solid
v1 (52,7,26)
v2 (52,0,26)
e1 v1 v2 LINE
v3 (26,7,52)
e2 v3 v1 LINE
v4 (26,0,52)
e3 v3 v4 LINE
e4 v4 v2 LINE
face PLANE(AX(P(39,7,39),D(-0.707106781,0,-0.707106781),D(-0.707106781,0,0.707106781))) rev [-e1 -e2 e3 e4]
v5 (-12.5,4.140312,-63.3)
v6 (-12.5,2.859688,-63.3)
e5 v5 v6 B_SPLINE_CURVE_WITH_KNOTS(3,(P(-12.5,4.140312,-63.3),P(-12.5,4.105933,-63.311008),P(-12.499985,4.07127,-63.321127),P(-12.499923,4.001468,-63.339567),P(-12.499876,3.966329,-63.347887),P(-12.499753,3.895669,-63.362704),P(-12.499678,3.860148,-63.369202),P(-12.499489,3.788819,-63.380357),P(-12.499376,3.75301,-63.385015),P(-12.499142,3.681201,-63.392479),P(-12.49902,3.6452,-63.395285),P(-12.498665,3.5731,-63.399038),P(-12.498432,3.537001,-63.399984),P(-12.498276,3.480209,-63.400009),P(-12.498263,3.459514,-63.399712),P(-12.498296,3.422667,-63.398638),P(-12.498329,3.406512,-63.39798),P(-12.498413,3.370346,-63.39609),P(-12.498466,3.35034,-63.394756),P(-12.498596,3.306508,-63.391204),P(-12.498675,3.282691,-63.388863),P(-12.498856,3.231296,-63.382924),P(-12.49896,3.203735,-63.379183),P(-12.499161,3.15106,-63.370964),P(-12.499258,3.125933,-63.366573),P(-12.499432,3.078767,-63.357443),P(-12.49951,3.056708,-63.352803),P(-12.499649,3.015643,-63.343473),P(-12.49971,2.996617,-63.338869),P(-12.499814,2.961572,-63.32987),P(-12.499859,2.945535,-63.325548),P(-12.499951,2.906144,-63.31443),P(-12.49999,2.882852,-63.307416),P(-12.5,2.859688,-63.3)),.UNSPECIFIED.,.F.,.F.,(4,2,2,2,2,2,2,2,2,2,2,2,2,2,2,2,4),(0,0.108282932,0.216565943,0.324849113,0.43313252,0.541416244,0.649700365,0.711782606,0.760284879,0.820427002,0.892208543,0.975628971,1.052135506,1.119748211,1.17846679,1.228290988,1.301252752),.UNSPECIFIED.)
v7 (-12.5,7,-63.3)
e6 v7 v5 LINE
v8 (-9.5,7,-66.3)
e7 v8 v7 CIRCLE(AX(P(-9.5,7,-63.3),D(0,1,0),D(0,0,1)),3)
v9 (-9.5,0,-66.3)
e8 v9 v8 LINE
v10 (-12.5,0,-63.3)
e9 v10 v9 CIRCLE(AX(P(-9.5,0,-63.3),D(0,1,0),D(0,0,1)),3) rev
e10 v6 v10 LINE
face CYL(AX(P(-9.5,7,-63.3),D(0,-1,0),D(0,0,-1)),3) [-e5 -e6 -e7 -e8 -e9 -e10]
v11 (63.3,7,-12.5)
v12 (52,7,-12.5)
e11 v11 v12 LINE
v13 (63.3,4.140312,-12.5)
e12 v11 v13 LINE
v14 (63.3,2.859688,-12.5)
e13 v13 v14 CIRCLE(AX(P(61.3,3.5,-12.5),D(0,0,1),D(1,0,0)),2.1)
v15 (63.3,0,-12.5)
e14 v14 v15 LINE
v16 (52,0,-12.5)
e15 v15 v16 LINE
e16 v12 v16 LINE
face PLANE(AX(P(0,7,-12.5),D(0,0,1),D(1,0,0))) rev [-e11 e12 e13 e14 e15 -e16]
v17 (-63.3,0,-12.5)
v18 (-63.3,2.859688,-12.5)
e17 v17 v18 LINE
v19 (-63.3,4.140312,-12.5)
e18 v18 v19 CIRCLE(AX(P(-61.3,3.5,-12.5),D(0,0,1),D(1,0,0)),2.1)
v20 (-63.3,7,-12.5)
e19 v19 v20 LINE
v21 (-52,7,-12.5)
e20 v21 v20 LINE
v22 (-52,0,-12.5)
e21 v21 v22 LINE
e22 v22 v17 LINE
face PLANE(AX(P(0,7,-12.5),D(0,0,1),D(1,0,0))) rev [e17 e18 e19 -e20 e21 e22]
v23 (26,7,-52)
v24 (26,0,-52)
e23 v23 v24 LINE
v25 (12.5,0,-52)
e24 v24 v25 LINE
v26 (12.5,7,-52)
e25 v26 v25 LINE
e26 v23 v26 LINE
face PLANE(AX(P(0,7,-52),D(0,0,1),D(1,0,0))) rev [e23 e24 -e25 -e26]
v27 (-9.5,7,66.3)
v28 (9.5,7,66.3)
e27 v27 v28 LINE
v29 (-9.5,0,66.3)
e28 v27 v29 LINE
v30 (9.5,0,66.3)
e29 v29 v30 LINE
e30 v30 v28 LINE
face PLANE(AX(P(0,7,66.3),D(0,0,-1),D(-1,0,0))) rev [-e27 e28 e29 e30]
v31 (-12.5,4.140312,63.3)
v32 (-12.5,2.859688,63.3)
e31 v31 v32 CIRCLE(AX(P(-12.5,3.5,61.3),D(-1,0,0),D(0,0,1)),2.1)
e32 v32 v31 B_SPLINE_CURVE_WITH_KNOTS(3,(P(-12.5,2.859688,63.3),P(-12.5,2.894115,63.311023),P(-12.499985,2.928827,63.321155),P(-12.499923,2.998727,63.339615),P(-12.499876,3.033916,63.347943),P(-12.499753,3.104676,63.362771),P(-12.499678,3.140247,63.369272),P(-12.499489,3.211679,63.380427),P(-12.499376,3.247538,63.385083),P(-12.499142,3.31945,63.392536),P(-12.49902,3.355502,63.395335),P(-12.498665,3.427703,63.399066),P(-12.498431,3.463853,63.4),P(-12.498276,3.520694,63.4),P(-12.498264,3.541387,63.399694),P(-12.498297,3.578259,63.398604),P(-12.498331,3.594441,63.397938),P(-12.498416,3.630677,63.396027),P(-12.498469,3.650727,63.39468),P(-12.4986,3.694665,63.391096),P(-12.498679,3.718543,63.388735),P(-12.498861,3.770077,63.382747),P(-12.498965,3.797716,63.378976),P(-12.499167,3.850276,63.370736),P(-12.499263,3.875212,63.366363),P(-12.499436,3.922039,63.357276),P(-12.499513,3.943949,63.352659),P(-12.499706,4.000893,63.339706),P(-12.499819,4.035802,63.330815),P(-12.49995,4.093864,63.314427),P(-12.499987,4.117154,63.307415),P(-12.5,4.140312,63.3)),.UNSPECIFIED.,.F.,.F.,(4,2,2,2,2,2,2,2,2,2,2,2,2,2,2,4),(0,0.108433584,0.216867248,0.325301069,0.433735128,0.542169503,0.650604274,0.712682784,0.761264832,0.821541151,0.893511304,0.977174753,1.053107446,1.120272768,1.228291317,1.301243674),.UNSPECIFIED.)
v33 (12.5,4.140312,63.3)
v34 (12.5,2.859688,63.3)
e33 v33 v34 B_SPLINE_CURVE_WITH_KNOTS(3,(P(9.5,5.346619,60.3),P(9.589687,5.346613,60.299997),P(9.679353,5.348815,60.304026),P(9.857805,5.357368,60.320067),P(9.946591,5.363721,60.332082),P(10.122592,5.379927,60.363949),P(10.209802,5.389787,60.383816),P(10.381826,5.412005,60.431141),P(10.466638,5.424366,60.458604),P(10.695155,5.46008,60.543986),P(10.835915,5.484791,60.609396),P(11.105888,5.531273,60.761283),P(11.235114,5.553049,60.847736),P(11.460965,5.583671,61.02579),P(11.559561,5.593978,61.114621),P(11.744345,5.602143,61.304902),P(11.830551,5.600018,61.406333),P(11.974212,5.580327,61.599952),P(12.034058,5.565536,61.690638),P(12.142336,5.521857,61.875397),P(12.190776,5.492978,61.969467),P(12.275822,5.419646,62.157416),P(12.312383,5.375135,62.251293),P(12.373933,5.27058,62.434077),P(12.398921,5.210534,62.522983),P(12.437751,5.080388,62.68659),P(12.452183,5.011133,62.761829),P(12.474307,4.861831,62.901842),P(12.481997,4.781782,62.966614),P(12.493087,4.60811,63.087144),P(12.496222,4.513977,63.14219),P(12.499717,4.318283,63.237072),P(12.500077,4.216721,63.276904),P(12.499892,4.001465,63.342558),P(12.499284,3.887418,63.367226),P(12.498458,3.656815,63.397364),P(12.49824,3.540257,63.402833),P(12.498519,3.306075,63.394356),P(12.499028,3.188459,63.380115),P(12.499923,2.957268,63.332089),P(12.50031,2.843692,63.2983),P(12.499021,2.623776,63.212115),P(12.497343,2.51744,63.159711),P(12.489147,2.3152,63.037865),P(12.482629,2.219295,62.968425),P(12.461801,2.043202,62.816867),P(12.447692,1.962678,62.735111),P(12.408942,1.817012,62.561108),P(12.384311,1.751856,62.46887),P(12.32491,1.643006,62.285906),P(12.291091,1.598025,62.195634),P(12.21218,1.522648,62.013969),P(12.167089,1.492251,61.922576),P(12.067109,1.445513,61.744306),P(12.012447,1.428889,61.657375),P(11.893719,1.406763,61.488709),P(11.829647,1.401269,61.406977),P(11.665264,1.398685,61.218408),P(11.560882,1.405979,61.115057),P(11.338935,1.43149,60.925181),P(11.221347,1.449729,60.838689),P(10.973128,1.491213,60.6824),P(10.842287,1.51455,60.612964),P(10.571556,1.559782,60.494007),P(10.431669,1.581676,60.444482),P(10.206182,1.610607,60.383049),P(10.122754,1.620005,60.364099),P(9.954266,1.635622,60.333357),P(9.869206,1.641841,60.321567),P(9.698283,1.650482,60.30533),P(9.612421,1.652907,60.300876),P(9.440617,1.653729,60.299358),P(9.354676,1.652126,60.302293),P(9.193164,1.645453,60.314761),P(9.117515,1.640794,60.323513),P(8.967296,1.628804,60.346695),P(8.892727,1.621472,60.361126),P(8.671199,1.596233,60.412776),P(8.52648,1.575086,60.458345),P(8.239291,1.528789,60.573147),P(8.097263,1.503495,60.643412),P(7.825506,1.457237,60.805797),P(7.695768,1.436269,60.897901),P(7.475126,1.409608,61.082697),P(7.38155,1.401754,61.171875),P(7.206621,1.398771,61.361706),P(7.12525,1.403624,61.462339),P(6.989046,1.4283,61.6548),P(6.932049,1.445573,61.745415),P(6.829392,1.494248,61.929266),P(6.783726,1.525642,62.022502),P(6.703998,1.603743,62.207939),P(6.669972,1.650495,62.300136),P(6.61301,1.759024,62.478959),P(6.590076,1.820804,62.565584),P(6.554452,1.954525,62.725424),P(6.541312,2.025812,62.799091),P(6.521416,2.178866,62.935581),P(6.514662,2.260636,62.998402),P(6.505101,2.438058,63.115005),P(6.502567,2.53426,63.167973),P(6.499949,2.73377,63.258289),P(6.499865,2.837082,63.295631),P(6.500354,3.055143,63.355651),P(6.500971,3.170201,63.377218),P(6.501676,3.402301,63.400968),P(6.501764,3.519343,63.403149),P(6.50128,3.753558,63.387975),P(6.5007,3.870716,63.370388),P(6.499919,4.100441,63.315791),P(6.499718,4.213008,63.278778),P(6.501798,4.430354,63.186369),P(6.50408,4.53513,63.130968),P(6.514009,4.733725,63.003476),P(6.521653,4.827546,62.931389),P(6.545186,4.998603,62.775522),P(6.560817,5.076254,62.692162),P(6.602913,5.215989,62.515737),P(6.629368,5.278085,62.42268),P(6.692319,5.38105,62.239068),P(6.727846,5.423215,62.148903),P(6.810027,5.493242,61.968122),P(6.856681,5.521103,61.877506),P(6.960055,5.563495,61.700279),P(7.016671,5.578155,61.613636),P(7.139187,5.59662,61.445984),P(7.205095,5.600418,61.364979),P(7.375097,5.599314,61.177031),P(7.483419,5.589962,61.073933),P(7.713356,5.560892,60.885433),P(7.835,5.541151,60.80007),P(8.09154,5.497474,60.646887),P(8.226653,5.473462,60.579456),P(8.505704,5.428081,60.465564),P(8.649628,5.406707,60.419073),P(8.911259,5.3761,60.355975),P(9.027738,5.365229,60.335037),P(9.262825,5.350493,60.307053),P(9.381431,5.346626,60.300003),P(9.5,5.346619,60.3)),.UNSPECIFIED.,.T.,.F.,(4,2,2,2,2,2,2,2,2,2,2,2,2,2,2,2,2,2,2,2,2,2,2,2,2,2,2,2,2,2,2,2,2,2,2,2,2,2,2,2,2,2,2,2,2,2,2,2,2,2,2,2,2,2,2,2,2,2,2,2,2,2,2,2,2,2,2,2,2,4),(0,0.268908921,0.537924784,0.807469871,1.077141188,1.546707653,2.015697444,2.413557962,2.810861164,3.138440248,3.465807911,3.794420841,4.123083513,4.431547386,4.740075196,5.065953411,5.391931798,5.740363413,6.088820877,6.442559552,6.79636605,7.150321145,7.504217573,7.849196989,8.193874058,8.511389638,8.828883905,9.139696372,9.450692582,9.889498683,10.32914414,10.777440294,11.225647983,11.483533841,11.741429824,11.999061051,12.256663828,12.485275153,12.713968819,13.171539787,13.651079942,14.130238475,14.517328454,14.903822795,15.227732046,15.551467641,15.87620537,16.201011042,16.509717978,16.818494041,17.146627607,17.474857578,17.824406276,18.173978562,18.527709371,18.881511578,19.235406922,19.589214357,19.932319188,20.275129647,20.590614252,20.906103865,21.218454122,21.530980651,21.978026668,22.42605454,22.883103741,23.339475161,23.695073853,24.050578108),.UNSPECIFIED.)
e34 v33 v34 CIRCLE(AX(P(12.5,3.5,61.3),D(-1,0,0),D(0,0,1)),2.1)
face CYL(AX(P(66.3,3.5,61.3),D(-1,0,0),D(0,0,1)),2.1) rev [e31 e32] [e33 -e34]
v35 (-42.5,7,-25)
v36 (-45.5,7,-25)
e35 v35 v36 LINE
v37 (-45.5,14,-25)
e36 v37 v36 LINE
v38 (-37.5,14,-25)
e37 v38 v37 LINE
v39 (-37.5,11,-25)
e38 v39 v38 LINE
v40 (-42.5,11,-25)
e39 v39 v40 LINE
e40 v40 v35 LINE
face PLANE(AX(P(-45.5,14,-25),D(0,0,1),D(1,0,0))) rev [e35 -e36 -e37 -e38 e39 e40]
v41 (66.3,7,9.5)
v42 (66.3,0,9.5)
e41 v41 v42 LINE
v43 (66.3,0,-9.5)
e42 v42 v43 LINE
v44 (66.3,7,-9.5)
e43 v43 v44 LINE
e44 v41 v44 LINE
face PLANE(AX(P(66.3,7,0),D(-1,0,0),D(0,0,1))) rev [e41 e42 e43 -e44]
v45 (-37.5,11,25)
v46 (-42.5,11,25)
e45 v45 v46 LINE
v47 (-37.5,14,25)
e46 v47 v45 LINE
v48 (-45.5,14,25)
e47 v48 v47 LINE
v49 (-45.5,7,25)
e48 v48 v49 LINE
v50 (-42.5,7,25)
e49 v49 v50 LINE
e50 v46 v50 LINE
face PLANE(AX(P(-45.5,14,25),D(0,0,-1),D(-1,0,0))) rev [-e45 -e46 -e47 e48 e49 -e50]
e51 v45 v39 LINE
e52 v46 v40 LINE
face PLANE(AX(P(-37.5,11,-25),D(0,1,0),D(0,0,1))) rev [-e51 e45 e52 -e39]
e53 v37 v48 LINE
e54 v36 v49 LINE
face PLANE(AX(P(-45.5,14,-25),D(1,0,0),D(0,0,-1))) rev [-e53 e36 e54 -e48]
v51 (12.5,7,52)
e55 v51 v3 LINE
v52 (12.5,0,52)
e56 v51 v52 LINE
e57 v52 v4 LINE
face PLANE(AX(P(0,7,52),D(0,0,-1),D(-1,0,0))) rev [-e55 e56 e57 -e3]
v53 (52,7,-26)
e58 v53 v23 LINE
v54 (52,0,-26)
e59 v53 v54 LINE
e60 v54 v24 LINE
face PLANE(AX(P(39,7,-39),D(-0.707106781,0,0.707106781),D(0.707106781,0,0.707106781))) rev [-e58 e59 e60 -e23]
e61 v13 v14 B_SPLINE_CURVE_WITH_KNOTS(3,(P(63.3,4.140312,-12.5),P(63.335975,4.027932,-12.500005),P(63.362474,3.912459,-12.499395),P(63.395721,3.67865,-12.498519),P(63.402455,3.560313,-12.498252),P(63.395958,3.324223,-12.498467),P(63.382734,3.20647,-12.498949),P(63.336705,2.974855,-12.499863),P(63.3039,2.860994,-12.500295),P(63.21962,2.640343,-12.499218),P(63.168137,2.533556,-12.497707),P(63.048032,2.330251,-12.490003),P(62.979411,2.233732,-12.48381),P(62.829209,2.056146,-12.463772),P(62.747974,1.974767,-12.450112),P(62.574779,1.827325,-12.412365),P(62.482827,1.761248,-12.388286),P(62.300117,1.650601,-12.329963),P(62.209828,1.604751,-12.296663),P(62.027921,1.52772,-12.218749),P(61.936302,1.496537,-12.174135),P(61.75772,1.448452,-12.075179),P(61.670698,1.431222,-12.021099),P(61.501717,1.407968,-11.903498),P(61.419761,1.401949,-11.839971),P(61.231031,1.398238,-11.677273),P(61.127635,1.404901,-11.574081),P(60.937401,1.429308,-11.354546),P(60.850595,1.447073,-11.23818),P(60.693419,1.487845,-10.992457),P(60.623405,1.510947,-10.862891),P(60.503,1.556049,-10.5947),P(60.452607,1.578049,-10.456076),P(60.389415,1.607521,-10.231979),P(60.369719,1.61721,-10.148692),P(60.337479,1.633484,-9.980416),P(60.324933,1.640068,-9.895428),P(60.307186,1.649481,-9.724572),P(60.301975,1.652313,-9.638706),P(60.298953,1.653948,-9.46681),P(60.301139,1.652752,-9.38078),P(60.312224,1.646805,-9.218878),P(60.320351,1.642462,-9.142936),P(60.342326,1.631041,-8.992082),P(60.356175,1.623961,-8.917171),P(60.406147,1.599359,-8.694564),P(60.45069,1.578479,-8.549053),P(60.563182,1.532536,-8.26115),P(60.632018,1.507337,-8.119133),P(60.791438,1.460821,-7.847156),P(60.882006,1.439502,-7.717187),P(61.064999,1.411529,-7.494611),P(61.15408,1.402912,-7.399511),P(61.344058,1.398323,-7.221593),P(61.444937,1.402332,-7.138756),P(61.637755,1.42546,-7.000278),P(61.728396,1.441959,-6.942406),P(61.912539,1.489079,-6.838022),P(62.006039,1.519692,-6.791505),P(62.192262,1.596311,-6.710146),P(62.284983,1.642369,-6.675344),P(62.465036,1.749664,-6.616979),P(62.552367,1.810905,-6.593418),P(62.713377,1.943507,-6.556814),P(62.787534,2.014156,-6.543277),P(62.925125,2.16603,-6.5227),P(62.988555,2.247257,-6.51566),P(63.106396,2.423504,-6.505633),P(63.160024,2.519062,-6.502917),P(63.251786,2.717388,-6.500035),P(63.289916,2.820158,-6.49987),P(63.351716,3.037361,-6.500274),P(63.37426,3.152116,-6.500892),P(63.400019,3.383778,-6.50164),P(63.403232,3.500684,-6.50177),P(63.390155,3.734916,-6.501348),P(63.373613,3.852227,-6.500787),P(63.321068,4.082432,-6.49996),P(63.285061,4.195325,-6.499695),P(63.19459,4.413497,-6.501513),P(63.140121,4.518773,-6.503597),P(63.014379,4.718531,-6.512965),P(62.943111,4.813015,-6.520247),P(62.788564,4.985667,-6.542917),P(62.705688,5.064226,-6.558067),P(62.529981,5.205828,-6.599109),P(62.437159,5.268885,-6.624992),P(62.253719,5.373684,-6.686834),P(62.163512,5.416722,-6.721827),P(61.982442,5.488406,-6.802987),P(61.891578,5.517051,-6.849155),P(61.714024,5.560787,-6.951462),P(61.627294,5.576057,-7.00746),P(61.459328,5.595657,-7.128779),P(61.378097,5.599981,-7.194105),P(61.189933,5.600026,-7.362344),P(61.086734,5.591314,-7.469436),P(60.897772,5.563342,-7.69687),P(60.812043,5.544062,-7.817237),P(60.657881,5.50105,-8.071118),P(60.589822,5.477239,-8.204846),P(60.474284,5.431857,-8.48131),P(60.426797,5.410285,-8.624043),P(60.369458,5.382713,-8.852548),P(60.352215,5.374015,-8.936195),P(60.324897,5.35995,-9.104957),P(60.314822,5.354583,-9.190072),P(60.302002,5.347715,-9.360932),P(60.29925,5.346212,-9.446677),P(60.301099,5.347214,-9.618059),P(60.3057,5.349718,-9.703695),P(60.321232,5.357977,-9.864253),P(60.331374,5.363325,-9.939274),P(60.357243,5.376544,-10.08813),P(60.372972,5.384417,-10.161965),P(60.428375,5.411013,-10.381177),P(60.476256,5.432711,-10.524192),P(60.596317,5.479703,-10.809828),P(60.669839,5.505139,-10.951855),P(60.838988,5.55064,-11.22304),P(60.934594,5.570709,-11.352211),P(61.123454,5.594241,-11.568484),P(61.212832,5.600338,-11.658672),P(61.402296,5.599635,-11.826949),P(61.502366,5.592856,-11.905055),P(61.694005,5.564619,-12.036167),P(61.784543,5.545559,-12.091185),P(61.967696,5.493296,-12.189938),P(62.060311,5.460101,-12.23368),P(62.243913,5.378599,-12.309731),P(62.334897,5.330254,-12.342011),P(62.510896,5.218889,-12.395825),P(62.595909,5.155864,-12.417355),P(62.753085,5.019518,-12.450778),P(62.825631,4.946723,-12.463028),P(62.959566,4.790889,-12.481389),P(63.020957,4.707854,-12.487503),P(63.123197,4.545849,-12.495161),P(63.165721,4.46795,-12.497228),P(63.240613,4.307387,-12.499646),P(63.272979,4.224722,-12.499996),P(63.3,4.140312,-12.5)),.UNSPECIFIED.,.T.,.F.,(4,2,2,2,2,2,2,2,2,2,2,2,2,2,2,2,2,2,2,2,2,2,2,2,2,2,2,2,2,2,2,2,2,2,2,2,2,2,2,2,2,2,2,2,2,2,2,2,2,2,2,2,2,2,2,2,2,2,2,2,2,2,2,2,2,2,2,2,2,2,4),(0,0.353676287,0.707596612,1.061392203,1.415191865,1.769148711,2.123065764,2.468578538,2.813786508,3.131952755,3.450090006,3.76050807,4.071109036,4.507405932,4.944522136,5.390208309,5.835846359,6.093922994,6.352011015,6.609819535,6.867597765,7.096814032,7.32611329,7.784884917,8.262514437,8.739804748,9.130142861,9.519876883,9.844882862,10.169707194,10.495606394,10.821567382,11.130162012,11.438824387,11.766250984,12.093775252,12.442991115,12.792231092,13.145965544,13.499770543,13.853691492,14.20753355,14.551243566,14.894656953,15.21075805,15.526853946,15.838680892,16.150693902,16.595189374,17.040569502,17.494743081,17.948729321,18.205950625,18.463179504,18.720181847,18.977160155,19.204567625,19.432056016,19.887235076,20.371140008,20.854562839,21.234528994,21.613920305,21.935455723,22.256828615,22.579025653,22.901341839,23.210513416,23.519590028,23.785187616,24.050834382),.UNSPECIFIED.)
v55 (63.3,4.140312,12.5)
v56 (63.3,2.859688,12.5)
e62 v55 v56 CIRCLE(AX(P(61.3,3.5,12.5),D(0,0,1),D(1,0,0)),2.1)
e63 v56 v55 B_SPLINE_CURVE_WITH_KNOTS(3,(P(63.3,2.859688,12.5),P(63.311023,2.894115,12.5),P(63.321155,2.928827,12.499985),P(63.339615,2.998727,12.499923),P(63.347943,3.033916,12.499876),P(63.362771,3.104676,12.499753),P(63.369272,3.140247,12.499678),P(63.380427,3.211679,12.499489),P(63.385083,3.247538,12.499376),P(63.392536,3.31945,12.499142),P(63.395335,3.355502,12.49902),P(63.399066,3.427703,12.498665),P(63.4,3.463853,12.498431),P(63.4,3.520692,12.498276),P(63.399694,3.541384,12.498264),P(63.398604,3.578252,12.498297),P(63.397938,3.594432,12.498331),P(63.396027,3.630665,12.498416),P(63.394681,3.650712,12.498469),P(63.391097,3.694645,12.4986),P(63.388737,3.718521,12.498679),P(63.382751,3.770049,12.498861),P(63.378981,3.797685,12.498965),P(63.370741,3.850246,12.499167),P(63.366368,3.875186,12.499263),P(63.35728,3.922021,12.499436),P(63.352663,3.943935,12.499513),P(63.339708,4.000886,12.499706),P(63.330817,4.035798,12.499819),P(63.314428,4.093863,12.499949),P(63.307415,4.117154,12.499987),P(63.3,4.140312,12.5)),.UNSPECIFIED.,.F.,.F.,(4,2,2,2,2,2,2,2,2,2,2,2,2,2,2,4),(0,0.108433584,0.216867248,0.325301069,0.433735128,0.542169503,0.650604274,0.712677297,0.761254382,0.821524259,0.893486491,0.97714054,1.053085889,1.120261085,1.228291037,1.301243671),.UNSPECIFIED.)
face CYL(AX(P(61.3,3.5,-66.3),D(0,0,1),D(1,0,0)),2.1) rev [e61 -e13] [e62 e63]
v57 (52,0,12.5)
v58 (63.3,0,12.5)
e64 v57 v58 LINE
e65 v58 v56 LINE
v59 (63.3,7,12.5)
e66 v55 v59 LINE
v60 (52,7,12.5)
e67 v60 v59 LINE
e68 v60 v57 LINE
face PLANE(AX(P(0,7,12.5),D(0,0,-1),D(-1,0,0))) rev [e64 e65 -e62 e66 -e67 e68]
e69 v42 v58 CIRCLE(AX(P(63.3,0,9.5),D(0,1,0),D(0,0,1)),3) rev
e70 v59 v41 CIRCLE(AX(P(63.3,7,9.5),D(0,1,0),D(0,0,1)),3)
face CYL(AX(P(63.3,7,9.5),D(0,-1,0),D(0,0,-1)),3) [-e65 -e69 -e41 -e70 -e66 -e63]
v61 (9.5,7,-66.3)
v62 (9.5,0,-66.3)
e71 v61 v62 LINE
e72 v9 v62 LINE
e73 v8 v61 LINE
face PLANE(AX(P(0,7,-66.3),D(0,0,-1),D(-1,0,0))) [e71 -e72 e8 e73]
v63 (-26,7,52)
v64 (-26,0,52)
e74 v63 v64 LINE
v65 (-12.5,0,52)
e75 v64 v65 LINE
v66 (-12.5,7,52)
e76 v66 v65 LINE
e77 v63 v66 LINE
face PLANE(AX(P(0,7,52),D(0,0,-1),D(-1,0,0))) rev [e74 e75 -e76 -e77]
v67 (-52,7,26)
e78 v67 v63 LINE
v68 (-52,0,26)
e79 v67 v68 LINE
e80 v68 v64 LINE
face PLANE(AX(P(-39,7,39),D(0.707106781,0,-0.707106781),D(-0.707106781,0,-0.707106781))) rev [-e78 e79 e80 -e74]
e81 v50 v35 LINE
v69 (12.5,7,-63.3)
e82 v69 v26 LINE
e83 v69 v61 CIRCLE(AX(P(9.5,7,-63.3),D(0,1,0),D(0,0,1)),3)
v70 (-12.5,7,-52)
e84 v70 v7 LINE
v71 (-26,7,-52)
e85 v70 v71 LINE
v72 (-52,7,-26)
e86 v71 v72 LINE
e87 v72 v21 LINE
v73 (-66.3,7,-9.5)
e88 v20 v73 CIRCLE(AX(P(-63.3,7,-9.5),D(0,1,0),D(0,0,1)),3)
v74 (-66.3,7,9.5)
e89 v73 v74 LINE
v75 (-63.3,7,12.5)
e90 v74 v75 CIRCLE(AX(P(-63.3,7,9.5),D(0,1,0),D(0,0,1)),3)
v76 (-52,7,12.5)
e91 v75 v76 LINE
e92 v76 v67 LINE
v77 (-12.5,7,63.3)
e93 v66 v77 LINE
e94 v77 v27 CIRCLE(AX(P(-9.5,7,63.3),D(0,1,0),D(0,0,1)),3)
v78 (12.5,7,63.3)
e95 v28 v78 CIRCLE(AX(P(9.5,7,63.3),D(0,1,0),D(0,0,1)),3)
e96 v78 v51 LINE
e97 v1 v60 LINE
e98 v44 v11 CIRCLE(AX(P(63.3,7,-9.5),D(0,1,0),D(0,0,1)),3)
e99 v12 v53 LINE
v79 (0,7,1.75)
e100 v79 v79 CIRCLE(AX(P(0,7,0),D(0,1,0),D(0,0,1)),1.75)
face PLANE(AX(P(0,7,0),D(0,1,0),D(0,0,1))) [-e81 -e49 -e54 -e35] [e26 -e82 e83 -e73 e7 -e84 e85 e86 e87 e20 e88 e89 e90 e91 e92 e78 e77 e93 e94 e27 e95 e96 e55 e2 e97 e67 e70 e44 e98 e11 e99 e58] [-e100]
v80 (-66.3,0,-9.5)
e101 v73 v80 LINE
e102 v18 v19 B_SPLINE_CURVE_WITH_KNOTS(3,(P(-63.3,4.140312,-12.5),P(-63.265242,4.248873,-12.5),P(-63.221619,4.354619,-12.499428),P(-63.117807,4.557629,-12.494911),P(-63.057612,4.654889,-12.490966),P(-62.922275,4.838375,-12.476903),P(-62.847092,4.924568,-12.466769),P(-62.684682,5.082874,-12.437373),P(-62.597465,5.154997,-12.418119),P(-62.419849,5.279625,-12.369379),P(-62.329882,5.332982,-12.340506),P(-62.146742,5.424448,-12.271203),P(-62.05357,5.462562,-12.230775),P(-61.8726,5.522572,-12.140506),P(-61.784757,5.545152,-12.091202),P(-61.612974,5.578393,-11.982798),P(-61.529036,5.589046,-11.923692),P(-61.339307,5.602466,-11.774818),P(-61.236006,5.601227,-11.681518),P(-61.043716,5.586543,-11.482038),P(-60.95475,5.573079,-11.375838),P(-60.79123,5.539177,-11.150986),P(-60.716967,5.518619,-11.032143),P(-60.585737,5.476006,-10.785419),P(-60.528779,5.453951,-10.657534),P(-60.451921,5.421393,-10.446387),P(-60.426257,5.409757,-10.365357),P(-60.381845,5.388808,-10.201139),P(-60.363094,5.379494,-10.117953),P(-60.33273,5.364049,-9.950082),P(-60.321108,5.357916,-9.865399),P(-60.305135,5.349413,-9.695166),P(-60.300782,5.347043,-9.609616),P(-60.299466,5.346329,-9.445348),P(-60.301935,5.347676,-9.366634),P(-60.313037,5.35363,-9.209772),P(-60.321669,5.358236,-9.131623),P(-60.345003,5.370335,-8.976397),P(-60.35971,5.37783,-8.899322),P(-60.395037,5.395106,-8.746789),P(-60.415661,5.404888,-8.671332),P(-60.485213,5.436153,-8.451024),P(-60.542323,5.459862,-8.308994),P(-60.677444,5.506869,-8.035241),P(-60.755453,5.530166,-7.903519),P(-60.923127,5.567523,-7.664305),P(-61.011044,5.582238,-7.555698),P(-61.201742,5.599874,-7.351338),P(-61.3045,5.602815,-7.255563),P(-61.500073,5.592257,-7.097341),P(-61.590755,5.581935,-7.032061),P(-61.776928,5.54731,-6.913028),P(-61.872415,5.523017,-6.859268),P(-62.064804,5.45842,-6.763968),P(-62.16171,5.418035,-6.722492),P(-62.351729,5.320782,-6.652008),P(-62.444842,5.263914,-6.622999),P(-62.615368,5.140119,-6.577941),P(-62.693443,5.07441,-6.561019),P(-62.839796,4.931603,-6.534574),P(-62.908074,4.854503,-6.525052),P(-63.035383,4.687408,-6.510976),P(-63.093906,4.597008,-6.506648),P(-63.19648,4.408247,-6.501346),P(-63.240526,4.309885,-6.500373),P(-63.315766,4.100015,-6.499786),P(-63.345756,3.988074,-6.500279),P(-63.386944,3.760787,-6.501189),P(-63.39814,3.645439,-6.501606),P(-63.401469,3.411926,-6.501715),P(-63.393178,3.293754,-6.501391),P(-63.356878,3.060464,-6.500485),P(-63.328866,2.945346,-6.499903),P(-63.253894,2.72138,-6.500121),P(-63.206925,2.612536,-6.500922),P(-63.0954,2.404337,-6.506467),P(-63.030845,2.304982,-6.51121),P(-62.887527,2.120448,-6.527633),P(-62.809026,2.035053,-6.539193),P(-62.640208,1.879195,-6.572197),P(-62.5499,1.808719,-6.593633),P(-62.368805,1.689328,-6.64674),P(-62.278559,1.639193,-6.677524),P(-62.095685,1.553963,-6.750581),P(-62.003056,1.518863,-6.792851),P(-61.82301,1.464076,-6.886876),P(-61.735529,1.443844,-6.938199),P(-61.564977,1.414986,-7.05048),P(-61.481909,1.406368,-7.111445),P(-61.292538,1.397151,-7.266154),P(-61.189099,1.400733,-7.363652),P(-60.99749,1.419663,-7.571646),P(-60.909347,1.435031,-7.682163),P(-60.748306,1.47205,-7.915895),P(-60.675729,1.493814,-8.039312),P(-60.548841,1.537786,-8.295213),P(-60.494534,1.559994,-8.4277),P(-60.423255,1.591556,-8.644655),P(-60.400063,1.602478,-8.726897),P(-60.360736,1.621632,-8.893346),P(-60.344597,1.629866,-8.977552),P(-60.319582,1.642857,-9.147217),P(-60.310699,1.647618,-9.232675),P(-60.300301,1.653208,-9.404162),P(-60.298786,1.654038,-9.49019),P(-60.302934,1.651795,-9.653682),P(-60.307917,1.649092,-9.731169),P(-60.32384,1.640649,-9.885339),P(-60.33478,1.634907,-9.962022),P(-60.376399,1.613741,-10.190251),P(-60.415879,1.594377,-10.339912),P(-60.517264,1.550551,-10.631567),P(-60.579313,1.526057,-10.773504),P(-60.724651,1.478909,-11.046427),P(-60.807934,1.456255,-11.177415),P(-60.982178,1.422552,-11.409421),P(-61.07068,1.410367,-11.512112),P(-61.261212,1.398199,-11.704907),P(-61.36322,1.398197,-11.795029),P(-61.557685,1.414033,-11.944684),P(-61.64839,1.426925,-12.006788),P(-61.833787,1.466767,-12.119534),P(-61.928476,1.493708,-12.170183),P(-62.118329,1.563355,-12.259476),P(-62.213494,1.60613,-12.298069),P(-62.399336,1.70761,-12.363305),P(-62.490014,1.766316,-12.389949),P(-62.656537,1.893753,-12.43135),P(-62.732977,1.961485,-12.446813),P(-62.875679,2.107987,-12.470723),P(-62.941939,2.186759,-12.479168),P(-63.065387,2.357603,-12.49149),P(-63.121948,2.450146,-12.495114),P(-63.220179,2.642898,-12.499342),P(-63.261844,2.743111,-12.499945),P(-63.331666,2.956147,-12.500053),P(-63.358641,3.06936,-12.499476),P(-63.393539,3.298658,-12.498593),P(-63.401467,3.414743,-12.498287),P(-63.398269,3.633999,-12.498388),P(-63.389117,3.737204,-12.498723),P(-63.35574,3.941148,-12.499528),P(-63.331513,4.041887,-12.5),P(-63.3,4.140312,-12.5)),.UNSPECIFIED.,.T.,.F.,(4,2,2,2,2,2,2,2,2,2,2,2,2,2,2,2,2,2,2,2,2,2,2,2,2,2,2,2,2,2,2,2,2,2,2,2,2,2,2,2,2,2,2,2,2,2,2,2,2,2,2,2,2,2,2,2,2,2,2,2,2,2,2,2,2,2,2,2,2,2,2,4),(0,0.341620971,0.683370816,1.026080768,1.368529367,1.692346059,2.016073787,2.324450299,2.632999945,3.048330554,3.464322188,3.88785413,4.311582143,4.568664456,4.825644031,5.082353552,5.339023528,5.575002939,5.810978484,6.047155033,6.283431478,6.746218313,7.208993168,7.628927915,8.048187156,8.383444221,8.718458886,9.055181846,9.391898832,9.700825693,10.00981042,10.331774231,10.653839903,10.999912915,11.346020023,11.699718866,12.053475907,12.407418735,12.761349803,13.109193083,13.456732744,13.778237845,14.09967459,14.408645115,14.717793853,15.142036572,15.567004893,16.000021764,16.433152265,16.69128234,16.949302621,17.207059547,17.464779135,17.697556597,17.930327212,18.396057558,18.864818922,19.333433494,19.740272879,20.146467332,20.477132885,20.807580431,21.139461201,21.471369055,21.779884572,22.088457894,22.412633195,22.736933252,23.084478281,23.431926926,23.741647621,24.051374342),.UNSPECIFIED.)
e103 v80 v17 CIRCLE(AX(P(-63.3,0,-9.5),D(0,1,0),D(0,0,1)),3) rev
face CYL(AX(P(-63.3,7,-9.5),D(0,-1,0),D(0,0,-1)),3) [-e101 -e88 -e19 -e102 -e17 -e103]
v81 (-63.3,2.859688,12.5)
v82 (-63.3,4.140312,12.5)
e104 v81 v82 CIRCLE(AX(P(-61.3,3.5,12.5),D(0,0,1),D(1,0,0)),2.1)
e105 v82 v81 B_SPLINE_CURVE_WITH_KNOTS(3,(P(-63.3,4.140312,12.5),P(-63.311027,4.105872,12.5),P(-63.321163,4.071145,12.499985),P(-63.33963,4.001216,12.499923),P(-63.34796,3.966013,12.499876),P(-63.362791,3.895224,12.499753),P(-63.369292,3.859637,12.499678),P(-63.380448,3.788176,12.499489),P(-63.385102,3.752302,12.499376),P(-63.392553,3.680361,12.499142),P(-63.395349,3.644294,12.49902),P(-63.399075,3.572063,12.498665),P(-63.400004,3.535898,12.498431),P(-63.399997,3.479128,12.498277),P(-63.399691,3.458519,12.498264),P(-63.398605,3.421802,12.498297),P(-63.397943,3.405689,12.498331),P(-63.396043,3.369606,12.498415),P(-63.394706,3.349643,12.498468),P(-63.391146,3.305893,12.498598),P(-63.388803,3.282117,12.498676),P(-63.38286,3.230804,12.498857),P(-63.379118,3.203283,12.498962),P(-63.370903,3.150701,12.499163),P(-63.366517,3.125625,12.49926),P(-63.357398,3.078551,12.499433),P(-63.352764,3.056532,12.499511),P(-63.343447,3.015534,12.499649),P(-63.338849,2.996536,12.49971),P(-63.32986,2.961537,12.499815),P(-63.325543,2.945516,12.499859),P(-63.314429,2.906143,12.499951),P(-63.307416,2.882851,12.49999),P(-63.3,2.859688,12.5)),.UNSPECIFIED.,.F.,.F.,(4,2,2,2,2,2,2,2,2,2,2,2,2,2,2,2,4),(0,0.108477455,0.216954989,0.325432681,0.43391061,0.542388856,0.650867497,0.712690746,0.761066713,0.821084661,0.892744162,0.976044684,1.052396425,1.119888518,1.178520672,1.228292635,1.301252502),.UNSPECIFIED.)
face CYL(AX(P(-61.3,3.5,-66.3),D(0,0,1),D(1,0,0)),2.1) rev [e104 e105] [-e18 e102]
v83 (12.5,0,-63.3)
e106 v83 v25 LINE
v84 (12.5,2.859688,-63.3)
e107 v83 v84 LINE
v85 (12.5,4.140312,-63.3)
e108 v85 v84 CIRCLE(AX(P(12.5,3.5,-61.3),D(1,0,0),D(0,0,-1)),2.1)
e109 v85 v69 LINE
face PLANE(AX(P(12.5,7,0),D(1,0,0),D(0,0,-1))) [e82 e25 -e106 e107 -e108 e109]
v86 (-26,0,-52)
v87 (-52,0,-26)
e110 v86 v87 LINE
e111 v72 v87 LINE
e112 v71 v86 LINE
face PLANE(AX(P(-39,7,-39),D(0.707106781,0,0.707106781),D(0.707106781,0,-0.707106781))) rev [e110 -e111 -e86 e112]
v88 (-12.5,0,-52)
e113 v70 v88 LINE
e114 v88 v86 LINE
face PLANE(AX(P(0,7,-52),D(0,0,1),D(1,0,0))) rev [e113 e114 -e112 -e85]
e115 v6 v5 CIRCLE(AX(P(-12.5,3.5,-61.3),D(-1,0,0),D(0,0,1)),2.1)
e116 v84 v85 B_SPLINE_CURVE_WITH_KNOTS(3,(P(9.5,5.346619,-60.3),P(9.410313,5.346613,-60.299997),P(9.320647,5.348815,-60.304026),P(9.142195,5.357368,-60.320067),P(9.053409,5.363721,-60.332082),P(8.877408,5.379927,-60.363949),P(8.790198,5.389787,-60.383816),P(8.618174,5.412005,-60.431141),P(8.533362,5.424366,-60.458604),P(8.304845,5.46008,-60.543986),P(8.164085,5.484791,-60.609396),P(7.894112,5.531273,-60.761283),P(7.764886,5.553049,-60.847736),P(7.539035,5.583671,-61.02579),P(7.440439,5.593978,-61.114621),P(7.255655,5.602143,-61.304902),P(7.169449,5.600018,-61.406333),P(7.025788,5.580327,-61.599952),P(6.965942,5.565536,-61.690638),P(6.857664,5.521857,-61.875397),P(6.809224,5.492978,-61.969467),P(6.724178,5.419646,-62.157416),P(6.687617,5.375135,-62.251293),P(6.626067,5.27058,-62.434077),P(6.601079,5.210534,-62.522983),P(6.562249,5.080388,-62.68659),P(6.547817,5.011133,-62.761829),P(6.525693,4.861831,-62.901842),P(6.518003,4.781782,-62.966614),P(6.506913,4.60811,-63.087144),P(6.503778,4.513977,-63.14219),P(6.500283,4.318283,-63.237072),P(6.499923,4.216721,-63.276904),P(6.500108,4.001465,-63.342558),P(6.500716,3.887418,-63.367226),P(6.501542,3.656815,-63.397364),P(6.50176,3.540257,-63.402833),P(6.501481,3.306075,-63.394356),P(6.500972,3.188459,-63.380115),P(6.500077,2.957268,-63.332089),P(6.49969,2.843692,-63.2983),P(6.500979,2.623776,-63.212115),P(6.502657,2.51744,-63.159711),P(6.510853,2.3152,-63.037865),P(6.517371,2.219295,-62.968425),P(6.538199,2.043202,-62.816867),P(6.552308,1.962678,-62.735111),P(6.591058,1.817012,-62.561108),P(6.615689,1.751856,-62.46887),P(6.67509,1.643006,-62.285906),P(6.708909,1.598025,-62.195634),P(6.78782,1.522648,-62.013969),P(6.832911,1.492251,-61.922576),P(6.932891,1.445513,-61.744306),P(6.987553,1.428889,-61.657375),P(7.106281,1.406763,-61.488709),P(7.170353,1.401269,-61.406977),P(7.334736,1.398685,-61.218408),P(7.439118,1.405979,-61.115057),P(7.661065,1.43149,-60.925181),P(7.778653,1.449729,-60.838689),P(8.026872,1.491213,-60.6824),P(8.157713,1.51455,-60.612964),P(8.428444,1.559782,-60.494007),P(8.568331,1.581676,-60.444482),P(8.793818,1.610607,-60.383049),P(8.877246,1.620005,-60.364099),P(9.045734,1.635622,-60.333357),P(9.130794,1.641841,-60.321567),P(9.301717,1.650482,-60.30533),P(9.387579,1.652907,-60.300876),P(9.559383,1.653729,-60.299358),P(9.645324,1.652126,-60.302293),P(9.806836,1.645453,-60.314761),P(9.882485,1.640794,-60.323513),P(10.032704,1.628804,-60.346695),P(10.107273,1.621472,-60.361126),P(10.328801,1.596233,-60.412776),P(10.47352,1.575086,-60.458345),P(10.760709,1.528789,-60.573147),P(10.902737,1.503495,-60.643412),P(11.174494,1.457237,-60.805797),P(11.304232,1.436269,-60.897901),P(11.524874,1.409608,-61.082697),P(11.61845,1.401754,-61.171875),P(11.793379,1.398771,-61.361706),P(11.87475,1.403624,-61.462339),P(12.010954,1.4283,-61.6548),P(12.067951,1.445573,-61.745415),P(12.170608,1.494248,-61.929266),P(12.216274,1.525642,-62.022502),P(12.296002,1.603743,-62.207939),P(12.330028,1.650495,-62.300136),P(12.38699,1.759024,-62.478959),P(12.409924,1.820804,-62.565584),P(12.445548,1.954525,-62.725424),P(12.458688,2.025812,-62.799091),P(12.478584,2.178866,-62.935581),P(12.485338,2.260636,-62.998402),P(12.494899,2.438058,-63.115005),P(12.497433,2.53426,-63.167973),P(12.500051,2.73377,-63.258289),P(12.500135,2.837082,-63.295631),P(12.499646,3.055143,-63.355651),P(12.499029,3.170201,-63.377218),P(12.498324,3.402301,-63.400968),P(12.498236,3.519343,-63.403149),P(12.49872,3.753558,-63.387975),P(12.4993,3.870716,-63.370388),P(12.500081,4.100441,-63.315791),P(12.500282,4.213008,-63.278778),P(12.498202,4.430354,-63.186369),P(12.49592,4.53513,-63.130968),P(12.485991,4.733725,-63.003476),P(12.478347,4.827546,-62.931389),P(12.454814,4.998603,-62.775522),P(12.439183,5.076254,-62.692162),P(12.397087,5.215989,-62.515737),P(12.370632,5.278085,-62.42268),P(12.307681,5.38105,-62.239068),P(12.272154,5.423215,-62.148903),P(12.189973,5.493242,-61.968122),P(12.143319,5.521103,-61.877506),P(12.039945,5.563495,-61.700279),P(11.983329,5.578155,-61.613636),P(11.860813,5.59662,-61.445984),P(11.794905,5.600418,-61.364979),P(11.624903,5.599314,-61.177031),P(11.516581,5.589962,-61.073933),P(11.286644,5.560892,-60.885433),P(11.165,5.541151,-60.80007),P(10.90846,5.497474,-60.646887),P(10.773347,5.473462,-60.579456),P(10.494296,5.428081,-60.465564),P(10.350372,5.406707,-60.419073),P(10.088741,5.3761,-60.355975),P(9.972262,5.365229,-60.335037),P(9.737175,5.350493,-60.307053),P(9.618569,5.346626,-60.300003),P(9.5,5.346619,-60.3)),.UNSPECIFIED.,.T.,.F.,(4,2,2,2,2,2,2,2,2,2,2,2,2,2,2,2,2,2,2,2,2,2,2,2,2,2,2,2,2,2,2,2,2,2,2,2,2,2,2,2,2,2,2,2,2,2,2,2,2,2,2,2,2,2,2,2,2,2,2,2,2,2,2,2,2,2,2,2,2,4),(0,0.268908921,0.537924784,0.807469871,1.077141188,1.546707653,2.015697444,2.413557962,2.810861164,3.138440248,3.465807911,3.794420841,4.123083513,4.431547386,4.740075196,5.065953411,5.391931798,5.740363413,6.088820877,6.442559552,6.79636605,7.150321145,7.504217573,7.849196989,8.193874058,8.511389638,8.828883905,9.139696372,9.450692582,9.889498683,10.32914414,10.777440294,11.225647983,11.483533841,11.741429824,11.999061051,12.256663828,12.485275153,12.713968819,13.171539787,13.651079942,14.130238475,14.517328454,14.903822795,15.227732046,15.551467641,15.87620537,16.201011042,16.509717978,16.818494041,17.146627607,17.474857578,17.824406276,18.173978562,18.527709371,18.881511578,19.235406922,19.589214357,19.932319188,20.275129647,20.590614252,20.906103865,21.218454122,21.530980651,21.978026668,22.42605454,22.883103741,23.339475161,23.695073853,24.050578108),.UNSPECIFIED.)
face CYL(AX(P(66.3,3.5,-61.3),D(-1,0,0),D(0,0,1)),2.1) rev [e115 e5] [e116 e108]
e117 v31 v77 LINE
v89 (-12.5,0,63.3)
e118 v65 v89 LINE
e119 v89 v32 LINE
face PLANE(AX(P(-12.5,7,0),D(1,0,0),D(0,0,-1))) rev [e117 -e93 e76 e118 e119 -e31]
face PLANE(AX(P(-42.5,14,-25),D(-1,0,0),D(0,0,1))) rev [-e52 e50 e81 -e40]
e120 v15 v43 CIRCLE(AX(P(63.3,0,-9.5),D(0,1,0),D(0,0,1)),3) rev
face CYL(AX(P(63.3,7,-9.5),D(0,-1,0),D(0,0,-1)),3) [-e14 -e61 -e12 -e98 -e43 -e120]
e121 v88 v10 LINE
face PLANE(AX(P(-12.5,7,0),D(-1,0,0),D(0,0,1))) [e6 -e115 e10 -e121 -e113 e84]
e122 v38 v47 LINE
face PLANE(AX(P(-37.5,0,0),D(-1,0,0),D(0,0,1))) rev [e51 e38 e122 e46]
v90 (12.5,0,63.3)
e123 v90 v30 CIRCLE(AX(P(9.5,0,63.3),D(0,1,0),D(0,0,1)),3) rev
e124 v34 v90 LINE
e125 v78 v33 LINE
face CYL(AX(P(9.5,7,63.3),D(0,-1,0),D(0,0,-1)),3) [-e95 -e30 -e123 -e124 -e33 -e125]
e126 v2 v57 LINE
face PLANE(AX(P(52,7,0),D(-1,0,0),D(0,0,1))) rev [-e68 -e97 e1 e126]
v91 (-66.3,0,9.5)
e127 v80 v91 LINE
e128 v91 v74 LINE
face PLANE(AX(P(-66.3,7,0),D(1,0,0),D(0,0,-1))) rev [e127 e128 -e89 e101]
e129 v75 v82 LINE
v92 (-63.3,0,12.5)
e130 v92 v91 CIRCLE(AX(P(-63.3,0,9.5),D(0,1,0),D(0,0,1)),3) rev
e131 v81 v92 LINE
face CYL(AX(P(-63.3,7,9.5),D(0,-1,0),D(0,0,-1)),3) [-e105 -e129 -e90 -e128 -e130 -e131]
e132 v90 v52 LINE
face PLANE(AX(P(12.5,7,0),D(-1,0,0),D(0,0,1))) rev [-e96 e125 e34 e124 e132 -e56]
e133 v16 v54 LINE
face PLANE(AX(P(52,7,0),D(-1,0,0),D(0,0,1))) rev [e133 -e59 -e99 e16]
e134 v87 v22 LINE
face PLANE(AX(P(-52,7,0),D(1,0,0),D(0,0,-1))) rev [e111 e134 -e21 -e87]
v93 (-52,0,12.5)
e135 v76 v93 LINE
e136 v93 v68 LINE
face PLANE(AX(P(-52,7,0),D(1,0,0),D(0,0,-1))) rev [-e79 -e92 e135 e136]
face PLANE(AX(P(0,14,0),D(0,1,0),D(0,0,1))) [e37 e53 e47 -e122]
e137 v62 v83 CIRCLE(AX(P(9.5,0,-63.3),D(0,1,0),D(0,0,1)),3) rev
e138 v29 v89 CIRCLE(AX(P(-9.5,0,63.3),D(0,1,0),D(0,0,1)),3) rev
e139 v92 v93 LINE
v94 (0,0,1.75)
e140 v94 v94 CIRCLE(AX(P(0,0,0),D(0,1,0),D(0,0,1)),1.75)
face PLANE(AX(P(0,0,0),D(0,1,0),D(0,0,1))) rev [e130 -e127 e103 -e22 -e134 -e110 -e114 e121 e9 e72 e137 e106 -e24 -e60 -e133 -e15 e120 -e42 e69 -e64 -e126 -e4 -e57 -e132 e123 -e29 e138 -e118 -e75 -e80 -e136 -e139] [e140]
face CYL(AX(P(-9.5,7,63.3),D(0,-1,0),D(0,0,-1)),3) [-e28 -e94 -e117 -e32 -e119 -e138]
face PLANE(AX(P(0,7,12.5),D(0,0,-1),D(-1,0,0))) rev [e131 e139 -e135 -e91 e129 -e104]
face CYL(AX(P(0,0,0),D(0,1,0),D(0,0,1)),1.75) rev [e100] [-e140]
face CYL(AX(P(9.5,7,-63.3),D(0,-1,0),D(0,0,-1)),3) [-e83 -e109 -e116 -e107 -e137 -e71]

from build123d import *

# Parameters (mm, degrees)
SKETCH_1_W          = 14.3
SKETCH_1_H          = 25
SKETCH_1_W_2        = 25
SKETCH_1_H_2        = 14.3
EXTRUDE_1_DEPTH     = 7
FILLET_1_R          = 3
FILLET_3_R          = 23
EXTRUDE_START       = -7
EXTRUDE_2_DEPTH     = 7
SKETCH_7_R          = 1.75
CUT_EXTRUDE_5_DEPTH = 95.023294986
SKETCH_9_W          = 3
SKETCH_9_H          = 50
EXTRUDE_3_DEPTH     = 7
SKETCH_10_W         = 50
SKETCH_10_H         = 3
EXTRUDE_4_DEPTH     = 5
SKETCH_11_R         = 2.1
CUT_EXTRUDE_6_DEPTH = 104.928485027
SKETCH_12_R         = 2.1
CUT_EXTRUDE_7_DEPTH = 104.928485103


with BuildPart() as part:
    # 스케치1 → 보스-돌출1 (new body)
    with BuildSketch(Plane(origin=(0, 0, 0), x_dir=(1, 0, 0), z_dir=(0, 1, 0))):
        Polygon((-26, 52), (-39, 39), (-26, 39), (26, 39), (39, 39), (26, 52), (12.5, 52), (-12.5, 52), align=None)
        Polygon((-26, 39), (-39, 39), (-39, 26), align=None)
        Polygon((-39, 26), (-39, 39), (-52, 26), (-52, 12.5), (-52, -12.5), (-52, -26), (-39, -39), (-39, -26), align=None)
        with Locations((-59.15, 0)):
            Rectangle(SKETCH_1_W, SKETCH_1_H)
        with Locations((0, 59.15)):
            Rectangle(SKETCH_1_W_2, SKETCH_1_H_2)
        Polygon((39, 39), (26, 39), (39, 26), align=None)
        Polygon((52, 26), (39, 39), (39, 26), (39, -26), (39, -39), (52, -26), (52, -12.5), (52, 12.5), align=None)
        with Locations((59.15, 0)):
            Rectangle(SKETCH_1_W, SKETCH_1_H)
        Polygon((39, -39), (39, -26), (26, -39), align=None)
        Polygon((-26, -39), (-39, -39), (-26, -52), (-12.5, -52), (12.5, -52), (26, -52), (39, -39), (26, -39), align=None)
        Polygon((-26, -39), (-39, -26), (-39, -39), align=None)
        with Locations((0, -59.15)):
            Rectangle(SKETCH_1_W_2, SKETCH_1_H_2)
    extrude(amount=EXTRUDE_1_DEPTH)

    # 필렛1
    fillet_1_edges = [part.edges().sort_by_distance(p)[0] for p in [
        (12.5, 3.5, 66.3),
        (-12.5, 3.5, 66.3),
        (-66.3, 3.5, 12.5),
        (-66.3, 3.5, -12.5),
        (-12.5, 3.5, -66.3),
        (12.5, 3.5, -66.3),
        (66.3, 3.5, -12.5),
        (66.3, 3.5, 12.5),
    ]]
    fillet(fillet_1_edges, radius=FILLET_1_R)

    # 필렛3
    # the kernel refuses this fillet: 23 mm, written as the material it adds along each edge
    with BuildSketch(Plane(origin=(-39, 0, 26), x_dir=(0, 0, -1), z_dir=(0, 1, 0))) as fillet_3_piece_1:
        with BuildLine():
            CenterArc((FILLET_3_R * 0.414213562373, -FILLET_3_R), FILLET_3_R, 90, 45)
            Line((-FILLET_3_R * 0.292893218813, -FILLET_3_R * 0.292893218813), (0, 0))
            Line((0, 0), (FILLET_3_R * 0.414213562373, 0))
        make_face()
    extrude(amount=7)
    with BuildSketch(Plane(origin=(-26, 0, 39), x_dir=(1, 0, 0), z_dir=(0, 1, 0)), Plane(origin=(26, 0, 39), x_dir=(0.7071067811865479, 0, -0.7071067811865471), z_dir=(0, 1, 0)), Plane(origin=(39, 0, 26), x_dir=(0, 0, -1), z_dir=(0, 1, 0)), Plane(origin=(39, 0, -26), x_dir=(-0.7071067811865476, 0, -0.7071067811865476), z_dir=(0, 1, 0)), Plane(origin=(26, 0, -39), x_dir=(-1, 0, 0), z_dir=(0, 1, 0)), Plane(origin=(-26, 0, -39), x_dir=(-0.7071067811865471, 0, 0.7071067811865479), z_dir=(0, 1, 0)), Plane(origin=(-39, 0, -26), x_dir=(0, 0, 1), z_dir=(0, 1, 0))) as fillet_3_piece_2:
        with BuildLine():
            CenterArc((FILLET_3_R * 0.414213562373, FILLET_3_R), FILLET_3_R, 225, 45)
            Line((-FILLET_3_R * 0.292893218813, FILLET_3_R * 0.292893218813), (0, 0))
            Line((0, 0), (FILLET_3_R * 0.414213562373, 0))
        make_face()
    extrude(amount=7)

    # 스케치6 → 보스-돌출2 (add)
    with BuildSketch(Plane(origin=(0, 7, 0), x_dir=(1, 0, 0), z_dir=(0, 1, 0)).offset(EXTRUDE_START)):
        with BuildLine():
            Line((16.473088065, 39), (-16.473088065, 39))
            ThreePointArc((-16.473088065, 39), (-25.120040329, 37.312677367), (-32.4982797, 32.4982797))
            ThreePointArc((-32.4982797, 32.4982797), (-37.312677367, 25.120040329), (-39, 16.473088065))
            Line((-39, 16.473088065), (-39, -16.473088065))
            ThreePointArc((-39, -16.473088065), (-37.312677367, -25.120040329), (-32.4982797, -32.4982797))
            ThreePointArc((-32.4982797, -32.4982797), (-25.120040329, -37.312677367), (-16.473088065, -39))
            Line((-16.473088065, -39), (16.473088065, -39))
            ThreePointArc((16.473088065, -39), (25.120040329, -37.312677367), (32.4982797, -32.4982797))
            ThreePointArc((32.4982797, -32.4982797), (37.312677367, -25.120040329), (39, -16.473088065))
            Line((39, -16.473088065), (39, 16.473088065))
            ThreePointArc((39, 16.473088065), (37.312677367, 25.120040329), (32.4982797, 32.4982797))
            ThreePointArc((32.4982797, 32.4982797), (25.120040329, 37.312677367), (16.473088065, 39))
        make_face()
    extrude(amount=EXTRUDE_2_DEPTH)

    # 스케치7 → 컷-돌출5 (cut, through all)
    with BuildSketch(Plane(origin=(0, 7, 0), x_dir=(1, 0, 0), z_dir=(0, 1, 0))):
        with Locations(Location((0, 0, 0), (0, 0, 270))):
            Circle(SKETCH_7_R)
    extrude(amount=-CUT_EXTRUDE_5_DEPTH, mode=Mode.SUBTRACT)

    # 스케치9 → 보스-돌출3 (add)
    with BuildSketch(Plane(origin=(0, 7, 0), x_dir=(1, 0, 0), z_dir=(0, 1, 0))):
        with Locations((-44, 0)):
            Rectangle(SKETCH_9_W, SKETCH_9_H)
    extrude(amount=EXTRUDE_3_DEPTH)

    # 스케치10 → 보스-돌출4 (add)
    with BuildSketch(Plane(origin=(-42.5, 0, 0), x_dir=(0, 0, -1), z_dir=(1, 0, 0))):
        with Locations((0, 12.5)):
            Rectangle(SKETCH_10_W, SKETCH_10_H)
    extrude(amount=EXTRUDE_4_DEPTH)

    # 스케치11 → 컷-돌출6 (cut, through all)
    with BuildSketch(Plane.XY.offset(12.5)):
        with Locations(Location((-61.3, 3.5, 0), (0, 0, 197.752790162))):
            Circle(SKETCH_11_R)
        with Locations(Location((61.3, 3.5, 0), (0, 0, 17.752790162))):
            Circle(SKETCH_11_R)
    extrude(amount=-CUT_EXTRUDE_6_DEPTH, mode=Mode.SUBTRACT)

    # 스케치12 → 컷-돌출7 (cut, through all)
    with BuildSketch(Plane.ZY.offset(12.5)):
        with Locations(Location((-61.3, 3.5, 0), (0, 0, 162.247209838))):
            Circle(SKETCH_12_R)
        with Locations(Location((61.3, 3.5, 0), (0, 0, 17.752790162))):
            Circle(SKETCH_12_R)
    extrude(amount=-CUT_EXTRUDE_7_DEPTH, mode=Mode.SUBTRACT)


solid = part.part
